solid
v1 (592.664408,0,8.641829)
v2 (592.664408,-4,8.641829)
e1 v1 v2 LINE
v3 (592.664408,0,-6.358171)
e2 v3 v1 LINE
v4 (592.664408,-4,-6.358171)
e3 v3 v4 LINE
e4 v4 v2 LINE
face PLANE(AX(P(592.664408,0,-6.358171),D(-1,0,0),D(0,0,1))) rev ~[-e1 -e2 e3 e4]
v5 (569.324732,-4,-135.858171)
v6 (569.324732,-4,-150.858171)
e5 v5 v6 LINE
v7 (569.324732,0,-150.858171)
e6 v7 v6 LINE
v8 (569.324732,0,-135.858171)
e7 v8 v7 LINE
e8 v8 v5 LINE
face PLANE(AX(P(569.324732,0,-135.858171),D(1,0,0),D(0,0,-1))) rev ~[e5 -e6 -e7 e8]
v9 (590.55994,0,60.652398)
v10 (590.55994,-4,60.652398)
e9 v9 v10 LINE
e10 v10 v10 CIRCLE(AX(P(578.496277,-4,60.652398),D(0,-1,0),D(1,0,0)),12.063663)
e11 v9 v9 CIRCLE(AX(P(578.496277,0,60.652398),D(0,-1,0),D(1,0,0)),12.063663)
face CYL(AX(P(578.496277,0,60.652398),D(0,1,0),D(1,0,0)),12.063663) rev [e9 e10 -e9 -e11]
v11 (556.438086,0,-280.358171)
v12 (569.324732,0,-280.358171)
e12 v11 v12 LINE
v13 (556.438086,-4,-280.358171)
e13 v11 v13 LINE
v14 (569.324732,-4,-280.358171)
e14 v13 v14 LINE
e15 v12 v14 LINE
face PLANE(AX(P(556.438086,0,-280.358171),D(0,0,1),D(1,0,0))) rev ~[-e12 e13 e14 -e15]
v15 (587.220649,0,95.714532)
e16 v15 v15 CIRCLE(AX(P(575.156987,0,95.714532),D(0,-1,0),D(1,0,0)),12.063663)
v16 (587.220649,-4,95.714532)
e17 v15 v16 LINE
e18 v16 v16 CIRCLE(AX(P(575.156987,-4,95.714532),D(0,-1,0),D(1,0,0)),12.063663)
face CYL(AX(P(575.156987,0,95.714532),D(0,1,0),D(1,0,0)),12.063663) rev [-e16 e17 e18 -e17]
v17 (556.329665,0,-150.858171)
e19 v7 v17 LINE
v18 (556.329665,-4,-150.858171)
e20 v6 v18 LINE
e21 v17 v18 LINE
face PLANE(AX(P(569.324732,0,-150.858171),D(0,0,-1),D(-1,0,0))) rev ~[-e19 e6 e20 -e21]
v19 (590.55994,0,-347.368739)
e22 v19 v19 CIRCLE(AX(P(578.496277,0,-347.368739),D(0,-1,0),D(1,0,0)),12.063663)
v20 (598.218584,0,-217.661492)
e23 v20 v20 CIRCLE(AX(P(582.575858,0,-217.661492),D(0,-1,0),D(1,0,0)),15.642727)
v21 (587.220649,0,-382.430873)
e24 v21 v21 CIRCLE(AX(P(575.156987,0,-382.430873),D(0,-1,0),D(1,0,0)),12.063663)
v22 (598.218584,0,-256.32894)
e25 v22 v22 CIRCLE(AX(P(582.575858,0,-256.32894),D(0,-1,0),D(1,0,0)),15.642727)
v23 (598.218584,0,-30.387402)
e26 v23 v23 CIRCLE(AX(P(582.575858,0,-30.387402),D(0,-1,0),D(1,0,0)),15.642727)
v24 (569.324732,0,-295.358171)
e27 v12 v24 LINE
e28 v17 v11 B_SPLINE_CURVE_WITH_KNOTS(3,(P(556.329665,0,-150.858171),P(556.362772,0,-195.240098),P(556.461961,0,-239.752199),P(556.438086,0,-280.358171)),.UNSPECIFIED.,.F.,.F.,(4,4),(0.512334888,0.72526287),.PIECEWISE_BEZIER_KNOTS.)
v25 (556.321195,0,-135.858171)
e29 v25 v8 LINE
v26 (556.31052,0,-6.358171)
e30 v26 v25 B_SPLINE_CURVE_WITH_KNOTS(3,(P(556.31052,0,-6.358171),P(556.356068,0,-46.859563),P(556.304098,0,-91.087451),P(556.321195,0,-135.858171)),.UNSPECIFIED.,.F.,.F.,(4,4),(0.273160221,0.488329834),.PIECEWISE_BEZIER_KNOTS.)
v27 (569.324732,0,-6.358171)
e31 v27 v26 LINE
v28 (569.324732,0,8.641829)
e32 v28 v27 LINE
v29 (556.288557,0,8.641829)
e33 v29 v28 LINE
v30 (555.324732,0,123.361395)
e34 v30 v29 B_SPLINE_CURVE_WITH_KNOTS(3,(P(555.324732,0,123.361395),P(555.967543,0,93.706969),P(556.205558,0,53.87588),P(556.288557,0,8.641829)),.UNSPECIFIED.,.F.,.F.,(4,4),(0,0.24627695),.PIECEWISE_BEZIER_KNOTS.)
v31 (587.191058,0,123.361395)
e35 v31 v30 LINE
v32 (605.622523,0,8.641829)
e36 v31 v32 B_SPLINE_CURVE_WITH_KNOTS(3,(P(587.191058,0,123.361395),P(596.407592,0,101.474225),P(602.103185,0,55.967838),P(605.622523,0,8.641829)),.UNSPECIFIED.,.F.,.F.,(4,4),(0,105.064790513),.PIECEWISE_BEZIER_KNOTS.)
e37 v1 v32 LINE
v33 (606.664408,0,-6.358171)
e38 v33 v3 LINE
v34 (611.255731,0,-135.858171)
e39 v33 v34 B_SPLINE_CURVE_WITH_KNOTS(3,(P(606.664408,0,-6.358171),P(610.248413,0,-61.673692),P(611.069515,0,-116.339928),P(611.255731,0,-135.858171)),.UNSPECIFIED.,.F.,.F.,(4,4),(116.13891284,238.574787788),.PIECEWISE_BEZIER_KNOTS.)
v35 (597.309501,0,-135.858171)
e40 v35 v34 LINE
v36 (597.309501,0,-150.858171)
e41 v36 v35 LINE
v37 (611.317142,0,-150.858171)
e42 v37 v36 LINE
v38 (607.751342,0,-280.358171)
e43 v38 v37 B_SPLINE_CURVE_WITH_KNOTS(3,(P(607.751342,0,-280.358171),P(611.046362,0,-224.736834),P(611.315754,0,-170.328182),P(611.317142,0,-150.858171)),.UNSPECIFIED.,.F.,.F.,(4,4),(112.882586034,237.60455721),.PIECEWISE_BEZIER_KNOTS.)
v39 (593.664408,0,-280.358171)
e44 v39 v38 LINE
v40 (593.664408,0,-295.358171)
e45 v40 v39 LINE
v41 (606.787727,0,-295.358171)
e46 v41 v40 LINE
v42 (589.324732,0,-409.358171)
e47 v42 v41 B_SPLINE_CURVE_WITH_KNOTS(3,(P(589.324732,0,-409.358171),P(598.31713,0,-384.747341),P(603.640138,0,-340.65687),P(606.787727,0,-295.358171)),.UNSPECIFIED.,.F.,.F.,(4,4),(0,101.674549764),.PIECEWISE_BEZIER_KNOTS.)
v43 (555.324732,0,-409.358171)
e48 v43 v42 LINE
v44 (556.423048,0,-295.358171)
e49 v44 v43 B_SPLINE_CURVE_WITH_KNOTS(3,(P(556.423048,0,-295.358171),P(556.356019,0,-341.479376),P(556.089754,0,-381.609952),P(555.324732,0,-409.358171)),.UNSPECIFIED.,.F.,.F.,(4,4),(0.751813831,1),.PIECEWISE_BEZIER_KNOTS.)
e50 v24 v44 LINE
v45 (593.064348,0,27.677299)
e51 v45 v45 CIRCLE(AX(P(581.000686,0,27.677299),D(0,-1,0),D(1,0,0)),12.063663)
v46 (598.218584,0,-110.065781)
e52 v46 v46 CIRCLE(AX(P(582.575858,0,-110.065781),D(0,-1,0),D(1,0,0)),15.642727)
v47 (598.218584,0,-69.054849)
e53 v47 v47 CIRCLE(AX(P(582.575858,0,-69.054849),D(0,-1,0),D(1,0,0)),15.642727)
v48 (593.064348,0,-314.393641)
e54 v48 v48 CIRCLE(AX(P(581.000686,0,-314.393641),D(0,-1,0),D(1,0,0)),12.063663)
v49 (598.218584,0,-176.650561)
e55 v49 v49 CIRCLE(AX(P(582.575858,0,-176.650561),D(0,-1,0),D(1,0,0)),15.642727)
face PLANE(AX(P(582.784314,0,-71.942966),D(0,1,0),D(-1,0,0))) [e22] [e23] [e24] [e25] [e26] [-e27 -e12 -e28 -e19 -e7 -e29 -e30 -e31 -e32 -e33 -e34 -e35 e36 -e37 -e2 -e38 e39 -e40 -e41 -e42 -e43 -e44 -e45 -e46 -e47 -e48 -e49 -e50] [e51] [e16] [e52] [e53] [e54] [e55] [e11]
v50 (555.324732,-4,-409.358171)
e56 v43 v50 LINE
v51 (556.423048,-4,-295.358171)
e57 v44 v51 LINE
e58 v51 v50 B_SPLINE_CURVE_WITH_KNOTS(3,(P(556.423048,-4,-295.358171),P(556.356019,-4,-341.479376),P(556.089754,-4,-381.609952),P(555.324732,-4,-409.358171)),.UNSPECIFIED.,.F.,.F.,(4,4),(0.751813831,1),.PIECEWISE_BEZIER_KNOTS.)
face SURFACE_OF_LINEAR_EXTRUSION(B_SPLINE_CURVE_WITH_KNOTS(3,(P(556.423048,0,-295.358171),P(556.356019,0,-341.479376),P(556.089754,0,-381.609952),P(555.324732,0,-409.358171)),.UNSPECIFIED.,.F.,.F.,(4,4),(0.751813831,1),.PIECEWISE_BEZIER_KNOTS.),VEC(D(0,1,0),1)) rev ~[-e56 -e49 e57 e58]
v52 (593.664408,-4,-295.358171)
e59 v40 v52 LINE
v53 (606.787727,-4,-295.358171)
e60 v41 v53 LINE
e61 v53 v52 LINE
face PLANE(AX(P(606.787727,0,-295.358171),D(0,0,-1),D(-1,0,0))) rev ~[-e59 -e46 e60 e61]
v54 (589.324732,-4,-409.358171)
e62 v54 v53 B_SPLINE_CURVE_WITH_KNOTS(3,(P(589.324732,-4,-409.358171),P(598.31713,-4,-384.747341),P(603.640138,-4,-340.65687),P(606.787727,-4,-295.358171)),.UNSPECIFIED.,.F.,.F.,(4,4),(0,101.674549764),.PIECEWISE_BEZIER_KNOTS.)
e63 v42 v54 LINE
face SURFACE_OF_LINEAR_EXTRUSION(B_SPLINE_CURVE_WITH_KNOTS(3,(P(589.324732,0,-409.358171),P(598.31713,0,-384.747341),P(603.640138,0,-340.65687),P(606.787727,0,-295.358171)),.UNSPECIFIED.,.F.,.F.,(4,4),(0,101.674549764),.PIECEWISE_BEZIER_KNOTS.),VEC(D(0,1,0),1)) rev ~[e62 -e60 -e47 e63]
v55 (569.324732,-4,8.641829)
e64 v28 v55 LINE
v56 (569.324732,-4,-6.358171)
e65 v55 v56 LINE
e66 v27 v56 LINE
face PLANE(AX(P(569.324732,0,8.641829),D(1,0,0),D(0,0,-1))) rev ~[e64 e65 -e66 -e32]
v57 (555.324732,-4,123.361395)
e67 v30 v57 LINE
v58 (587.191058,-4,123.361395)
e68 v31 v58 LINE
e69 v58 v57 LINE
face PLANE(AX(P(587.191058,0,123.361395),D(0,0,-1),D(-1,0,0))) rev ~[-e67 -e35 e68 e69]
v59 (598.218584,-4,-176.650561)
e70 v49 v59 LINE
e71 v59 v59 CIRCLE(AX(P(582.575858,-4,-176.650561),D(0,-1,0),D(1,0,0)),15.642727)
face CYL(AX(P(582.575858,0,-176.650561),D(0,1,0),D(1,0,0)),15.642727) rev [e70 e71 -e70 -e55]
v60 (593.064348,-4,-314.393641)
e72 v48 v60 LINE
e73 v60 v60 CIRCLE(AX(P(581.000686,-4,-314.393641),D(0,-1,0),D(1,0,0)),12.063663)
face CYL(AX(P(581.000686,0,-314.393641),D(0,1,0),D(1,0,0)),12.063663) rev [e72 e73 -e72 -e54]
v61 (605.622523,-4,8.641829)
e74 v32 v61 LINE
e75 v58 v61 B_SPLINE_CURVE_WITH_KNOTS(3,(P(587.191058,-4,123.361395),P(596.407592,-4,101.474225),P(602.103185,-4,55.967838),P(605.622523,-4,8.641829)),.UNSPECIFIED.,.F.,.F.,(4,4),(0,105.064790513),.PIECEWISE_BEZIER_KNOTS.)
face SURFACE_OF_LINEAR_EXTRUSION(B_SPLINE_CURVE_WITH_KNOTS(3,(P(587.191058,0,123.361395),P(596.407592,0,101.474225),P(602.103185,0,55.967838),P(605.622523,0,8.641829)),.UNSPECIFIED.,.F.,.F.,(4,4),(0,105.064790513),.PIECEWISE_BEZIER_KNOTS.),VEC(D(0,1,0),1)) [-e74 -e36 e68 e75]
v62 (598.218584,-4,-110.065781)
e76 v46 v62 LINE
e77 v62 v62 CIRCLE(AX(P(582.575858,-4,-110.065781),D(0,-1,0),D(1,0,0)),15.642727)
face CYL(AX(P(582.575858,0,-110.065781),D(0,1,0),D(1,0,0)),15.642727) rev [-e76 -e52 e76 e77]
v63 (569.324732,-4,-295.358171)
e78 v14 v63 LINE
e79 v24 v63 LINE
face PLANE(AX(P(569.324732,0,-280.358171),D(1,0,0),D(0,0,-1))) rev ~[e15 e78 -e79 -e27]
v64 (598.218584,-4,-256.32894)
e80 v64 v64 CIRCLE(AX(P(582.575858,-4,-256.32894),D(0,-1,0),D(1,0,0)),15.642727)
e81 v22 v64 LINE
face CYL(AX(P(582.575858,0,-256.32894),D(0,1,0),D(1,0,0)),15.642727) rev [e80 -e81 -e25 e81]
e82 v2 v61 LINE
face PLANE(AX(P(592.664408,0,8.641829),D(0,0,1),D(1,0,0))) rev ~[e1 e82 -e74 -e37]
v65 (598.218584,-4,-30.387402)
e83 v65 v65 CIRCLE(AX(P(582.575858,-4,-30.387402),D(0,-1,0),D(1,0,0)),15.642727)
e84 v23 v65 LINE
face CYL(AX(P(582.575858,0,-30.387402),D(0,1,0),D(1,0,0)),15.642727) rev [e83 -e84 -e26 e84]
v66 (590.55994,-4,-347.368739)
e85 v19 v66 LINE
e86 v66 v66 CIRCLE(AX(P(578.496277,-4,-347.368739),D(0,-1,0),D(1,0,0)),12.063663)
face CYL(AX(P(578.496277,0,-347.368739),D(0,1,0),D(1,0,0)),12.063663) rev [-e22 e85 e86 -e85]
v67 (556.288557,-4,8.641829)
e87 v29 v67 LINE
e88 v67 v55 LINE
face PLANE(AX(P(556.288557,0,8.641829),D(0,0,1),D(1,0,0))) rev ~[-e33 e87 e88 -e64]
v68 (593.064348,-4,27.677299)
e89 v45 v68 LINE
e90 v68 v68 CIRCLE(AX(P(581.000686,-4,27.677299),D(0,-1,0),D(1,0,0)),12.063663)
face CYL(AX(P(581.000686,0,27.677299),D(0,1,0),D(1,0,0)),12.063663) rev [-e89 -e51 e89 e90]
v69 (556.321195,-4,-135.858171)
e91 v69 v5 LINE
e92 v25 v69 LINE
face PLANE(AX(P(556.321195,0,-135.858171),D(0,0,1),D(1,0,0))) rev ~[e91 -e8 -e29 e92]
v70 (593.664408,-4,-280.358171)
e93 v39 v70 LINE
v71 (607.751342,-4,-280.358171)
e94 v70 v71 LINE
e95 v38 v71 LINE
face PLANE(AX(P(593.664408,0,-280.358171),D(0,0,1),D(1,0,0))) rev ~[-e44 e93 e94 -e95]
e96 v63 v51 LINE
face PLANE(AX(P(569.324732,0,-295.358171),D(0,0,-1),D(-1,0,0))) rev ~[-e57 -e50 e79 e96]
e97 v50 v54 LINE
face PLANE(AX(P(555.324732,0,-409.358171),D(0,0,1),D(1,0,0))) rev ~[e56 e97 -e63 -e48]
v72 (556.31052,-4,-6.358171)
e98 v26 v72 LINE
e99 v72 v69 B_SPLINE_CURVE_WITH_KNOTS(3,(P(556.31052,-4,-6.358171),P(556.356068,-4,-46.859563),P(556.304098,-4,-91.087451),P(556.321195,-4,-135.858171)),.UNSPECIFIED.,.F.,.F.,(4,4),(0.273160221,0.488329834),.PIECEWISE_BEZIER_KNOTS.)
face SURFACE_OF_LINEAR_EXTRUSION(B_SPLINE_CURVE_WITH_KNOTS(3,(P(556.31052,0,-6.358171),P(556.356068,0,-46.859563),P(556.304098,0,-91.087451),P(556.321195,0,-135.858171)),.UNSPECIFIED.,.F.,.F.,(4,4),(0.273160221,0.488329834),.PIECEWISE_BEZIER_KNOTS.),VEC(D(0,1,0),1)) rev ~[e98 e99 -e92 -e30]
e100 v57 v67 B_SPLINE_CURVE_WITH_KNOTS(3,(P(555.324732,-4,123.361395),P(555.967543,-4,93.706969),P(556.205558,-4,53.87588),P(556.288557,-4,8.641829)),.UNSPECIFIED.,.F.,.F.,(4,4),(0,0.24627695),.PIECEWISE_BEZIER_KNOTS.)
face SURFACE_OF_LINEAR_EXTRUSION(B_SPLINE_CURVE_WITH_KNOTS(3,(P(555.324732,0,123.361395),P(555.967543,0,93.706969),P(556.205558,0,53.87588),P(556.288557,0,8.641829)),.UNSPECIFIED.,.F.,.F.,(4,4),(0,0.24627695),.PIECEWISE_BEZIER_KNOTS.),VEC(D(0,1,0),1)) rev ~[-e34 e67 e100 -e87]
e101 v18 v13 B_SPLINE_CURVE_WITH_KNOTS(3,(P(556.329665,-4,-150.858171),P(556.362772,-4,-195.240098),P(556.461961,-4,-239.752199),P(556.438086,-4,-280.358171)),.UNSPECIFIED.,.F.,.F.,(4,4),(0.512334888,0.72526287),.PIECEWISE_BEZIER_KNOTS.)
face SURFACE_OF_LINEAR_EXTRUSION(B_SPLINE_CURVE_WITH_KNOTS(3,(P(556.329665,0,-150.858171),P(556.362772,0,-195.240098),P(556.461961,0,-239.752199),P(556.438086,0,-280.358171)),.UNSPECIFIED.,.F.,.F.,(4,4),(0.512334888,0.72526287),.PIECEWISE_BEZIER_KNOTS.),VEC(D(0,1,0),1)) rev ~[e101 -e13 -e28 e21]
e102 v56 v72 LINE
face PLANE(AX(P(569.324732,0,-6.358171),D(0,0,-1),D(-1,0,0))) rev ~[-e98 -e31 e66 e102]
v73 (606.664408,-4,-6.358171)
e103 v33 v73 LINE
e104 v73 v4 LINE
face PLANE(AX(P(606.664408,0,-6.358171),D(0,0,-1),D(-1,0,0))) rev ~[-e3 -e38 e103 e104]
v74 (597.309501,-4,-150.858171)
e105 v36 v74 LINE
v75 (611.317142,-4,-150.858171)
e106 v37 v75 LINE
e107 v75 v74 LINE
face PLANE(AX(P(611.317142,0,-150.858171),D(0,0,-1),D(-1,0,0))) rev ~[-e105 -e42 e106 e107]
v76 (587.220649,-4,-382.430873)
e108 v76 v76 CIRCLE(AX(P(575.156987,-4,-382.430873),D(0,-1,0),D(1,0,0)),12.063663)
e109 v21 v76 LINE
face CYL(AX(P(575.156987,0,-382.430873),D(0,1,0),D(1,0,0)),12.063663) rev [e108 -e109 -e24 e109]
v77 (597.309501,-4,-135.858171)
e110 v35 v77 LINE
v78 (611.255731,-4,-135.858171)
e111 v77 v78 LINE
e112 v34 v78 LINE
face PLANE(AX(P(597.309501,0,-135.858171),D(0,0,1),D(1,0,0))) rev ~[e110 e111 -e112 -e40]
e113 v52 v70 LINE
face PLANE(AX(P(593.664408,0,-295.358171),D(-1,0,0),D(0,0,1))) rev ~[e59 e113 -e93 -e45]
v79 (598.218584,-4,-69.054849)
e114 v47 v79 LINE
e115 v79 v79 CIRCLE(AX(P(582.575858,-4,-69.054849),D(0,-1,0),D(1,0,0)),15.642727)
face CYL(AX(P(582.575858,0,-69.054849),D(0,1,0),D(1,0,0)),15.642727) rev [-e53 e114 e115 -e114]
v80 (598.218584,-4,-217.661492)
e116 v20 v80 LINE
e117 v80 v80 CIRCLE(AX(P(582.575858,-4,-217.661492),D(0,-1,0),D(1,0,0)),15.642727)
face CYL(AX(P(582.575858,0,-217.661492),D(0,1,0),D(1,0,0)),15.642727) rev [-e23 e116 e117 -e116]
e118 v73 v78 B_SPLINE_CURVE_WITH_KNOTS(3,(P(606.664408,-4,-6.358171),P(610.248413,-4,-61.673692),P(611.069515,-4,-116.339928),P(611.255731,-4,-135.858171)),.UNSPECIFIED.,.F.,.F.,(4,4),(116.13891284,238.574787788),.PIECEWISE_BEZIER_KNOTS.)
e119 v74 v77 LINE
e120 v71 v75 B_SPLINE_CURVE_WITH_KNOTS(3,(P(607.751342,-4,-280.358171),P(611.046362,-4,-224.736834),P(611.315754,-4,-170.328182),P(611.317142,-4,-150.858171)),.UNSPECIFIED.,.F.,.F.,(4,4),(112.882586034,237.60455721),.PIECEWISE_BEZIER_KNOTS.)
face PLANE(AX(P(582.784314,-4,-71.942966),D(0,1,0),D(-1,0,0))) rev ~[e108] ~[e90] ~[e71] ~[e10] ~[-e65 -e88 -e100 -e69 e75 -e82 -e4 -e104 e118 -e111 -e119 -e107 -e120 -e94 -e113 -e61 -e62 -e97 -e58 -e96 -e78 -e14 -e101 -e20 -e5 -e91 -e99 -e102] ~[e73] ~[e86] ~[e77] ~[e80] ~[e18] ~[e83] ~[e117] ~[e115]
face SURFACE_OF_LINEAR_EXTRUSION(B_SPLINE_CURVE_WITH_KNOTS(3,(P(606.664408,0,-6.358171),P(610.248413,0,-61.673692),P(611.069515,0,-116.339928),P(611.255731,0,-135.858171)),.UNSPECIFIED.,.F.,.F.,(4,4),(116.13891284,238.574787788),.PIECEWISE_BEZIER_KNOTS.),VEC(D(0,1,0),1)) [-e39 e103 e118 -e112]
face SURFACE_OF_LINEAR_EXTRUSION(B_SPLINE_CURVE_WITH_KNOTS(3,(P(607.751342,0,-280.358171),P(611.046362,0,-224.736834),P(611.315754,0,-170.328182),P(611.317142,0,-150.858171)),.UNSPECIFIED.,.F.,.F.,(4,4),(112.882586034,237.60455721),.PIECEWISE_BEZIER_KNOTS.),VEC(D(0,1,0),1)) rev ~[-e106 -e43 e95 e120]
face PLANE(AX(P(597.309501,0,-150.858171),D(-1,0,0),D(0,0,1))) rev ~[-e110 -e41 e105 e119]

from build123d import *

# Parameters (mm, degrees)
F0_R     = 15.6427266016
F0_R_2   = 12.0636627394
F1_DEPTH = 4


# Not quite as in the source:
# - a feature names something its author has since deleted; it is built from what else it names


with BuildPart() as f1:
    # F0 (on Front) → F1 (new body)
    with BuildSketch(Plane.XZ):
        with BuildLine():
            add(Edge.make_bspline(
                [(606.664408162, -6.3581708061), (610.2484126071, -61.6736918338), (611.0695149221, -116.339928141), (611.2557314215, -135.8581708061)],
                knots=[116.1389128405, 116.1389128405, 116.1389128405, 116.1389128405, 238.5747877883, 238.5747877883, 238.5747877883, 238.5747877883], degree=3))
            Line((606.664408162, -6.3581708061), (592.664408162, -6.3581708061))
            Line((592.664408162, -6.3581708061), (592.664408162, 1.1418291939))
            Line((592.664408162, 1.1418291939), (569.3247318268, 1.1418291939))
            Line((569.3247318268, 1.1418291939), (569.3247318268, -6.3581708061))
            Line((569.3247318268, -6.3581708061), (556.3105202547, -6.3581708061))
            add(Edge.make_bspline(
                [(556.3105202547, -6.3581708062), (556.3560675182, -46.8595634464), (556.3040983749, -91.0874507126), (556.321195241, -135.8581708062)],
                knots=[0.2731602209, 0.2731602209, 0.2731602209, 0.2731602209, 0.4883298337, 0.4883298337, 0.4883298337, 0.4883298337], degree=3))
            Line((556.321195241, -135.8581708061), (569.3247318268, -135.8581708061))
            Line((569.3247318268, -135.8581708061), (569.3247318268, -143.3581708061))
            Line((569.3247318268, -143.3581708061), (597.3095011307, -143.3581708061))
            Line((597.3095011307, -143.3581708061), (597.3095011307, -135.8581708061))
            Line((597.3095011307, -135.8581708061), (611.2557314215, -135.8581708061))
        make_face()
        with Locations((582.5758576393, -110.06578058)):
            Circle(F0_R, mode=Mode.SUBTRACT)
        with Locations((582.5758576393, -69.0548494458)):
            Circle(F0_R, mode=Mode.SUBTRACT)
        with Locations((582.5758576393, -30.3874015808)):
            Circle(F0_R, mode=Mode.SUBTRACT)
        with BuildLine():
            add(Edge.make_bspline(
                [(587.1910579171, 123.3613954191), (596.407592129, 101.4742246466), (602.1031854422, 55.9678384662), (605.6225226157, 8.6418291939)],
                knots=[0, 0, 0, 0, 105.0647905127, 105.0647905127, 105.0647905127, 105.0647905127], degree=3))
            Line((587.1910579171, 123.3613954191), (563.1910579171, 123.3613954191))
            Line((563.1910579171, 123.3613954191), (555.3247318268, 123.3613954191))
            add(Edge.make_bspline(
                [(555.3247318268, 123.3613954191), (555.9675431408, 93.7069693731), (556.2055580917, 53.8758795815), (556.2885566673, 8.6418291939)],
                knots=[0, 0, 0, 0, 0.2462769496, 0.2462769496, 0.2462769496, 0.2462769496], degree=3))
            Line((556.2885566673, 8.6418291939), (569.3247318268, 8.6418291939))
            Line((569.3247318268, 8.6418291939), (569.3247318268, 1.1418291939))
            Line((569.3247318268, 1.1418291939), (592.664408162, 1.1418291939))
            Line((592.664408162, 1.1418291939), (592.664408162, 8.6418291939))
            Line((592.664408162, 8.6418291939), (605.6225226157, 8.6418291939))
        make_face()
        with Locations((581.0006856918, 27.6772994548)):
            Circle(F0_R_2, mode=Mode.SUBTRACT)
        with Locations((575.1569867134, 95.7145318389)):
            Circle(F0_R_2, mode=Mode.SUBTRACT)
        with Locations((578.4962773323, 60.652397573)):
            Circle(F0_R_2, mode=Mode.SUBTRACT)
        with BuildLine():
            add(Edge.make_bspline(
                [(607.7513419726, -280.3581708061), (611.0463615473, -224.7368336409), (611.3157540895, -170.3281819541), (611.3171415076, -150.8581708061)],
                knots=[112.8825860344, 112.8825860344, 112.8825860344, 112.8825860344, 237.6045572103, 237.6045572103, 237.6045572103, 237.6045572103], degree=3))
            Line((611.3171415076, -150.8581708061), (611.3095011307, -150.8581708061))
            Line((611.3095011307, -150.8581708061), (597.3095011307, -150.8581708061))
            Line((597.3095011307, -150.8581708061), (597.3095011307, -143.3581708061))
            Line((597.3095011307, -143.3581708061), (569.3247318268, -143.3581708061))
            Line((569.3247318268, -143.3581708061), (569.3247318268, -150.8581708061))
            Line((569.3247318268, -150.8581708061), (556.3296648649, -150.8581708061))
            add(Edge.make_bspline(
                [(556.3296648649, -150.8581708062), (556.3627723501, -195.2400977423), (556.4619608218, -239.7521985209), (556.4380859402, -280.3581708061)],
                knots=[0.5123348883, 0.5123348883, 0.5123348883, 0.5123348883, 0.7252628697, 0.7252628697, 0.7252628697, 0.7252628697], degree=3))
            Line((556.4380859402, -280.3581708061), (569.3247318268, -280.3581708061))
            Line((569.3247318268, -280.3581708061), (569.3247318268, -287.8581708061))
            Line((569.3247318268, -287.8581708061), (569.3247318268, -295.3581708061))
            Line((569.3247318268, -295.3581708061), (556.4230475774, -295.3581708061))
            add(Edge.make_bspline(
                [(556.4230475774, -295.3581708061), (556.3560187283, -341.4793760002), (556.0897539461, -381.6099515969), (555.3247318268, -409.3581708061)],
                knots=[0.7518138312, 0.7518138312, 0.7518138312, 0.7518138312, 1, 1, 1, 1], degree=3))
            Line((555.3247318268, -409.3581708061), (556.8649172783, -409.3581708061))
            Line((556.8649172783, -409.3581708061), (589.3247318268, -409.3581708061))
            add(Edge.make_bspline(
                [(589.3247318268, -409.3581708061), (598.3171301483, -384.7473411865), (603.6401377777, -340.6568702112), (606.7877271908, -295.3581708061)],
                knots=[0, 0, 0, 0, 101.6745497642, 101.6745497642, 101.6745497642, 101.6745497642], degree=3))
            Line((606.7877271908, -295.3581708061), (605.6225226157, -295.3581708061))
            Line((605.6225226157, -295.3581708061), (593.664408162, -295.3581708061))
            Line((593.664408162, -295.3581708061), (593.664408162, -280.3581708061))
            Line((593.664408162, -280.3581708061), (606.664408162, -280.3581708061))
            Line((606.664408162, -280.3581708061), (607.7513419726, -280.3581708061))
        make_face()
        with Locations((575.1569867134, -382.4308734512)):
            Circle(F0_R_2, mode=Mode.SUBTRACT)
        with Locations((578.4962773323, -347.3687391853)):
            Circle(F0_R_2, mode=Mode.SUBTRACT)
        with Locations((581.0006856918, -314.3936410671)):
            Circle(F0_R_2, mode=Mode.SUBTRACT)
        with Locations((582.5758576393, -256.3289400315)):
            Circle(F0_R, mode=Mode.SUBTRACT)
        with Locations((582.5758576393, -217.6614921665)):
            Circle(F0_R, mode=Mode.SUBTRACT)
        with Locations((582.5758576393, -176.6505610322)):
            Circle(F0_R, mode=Mode.SUBTRACT)
    extrude(amount=F1_DEPTH)


solid = f1.part
